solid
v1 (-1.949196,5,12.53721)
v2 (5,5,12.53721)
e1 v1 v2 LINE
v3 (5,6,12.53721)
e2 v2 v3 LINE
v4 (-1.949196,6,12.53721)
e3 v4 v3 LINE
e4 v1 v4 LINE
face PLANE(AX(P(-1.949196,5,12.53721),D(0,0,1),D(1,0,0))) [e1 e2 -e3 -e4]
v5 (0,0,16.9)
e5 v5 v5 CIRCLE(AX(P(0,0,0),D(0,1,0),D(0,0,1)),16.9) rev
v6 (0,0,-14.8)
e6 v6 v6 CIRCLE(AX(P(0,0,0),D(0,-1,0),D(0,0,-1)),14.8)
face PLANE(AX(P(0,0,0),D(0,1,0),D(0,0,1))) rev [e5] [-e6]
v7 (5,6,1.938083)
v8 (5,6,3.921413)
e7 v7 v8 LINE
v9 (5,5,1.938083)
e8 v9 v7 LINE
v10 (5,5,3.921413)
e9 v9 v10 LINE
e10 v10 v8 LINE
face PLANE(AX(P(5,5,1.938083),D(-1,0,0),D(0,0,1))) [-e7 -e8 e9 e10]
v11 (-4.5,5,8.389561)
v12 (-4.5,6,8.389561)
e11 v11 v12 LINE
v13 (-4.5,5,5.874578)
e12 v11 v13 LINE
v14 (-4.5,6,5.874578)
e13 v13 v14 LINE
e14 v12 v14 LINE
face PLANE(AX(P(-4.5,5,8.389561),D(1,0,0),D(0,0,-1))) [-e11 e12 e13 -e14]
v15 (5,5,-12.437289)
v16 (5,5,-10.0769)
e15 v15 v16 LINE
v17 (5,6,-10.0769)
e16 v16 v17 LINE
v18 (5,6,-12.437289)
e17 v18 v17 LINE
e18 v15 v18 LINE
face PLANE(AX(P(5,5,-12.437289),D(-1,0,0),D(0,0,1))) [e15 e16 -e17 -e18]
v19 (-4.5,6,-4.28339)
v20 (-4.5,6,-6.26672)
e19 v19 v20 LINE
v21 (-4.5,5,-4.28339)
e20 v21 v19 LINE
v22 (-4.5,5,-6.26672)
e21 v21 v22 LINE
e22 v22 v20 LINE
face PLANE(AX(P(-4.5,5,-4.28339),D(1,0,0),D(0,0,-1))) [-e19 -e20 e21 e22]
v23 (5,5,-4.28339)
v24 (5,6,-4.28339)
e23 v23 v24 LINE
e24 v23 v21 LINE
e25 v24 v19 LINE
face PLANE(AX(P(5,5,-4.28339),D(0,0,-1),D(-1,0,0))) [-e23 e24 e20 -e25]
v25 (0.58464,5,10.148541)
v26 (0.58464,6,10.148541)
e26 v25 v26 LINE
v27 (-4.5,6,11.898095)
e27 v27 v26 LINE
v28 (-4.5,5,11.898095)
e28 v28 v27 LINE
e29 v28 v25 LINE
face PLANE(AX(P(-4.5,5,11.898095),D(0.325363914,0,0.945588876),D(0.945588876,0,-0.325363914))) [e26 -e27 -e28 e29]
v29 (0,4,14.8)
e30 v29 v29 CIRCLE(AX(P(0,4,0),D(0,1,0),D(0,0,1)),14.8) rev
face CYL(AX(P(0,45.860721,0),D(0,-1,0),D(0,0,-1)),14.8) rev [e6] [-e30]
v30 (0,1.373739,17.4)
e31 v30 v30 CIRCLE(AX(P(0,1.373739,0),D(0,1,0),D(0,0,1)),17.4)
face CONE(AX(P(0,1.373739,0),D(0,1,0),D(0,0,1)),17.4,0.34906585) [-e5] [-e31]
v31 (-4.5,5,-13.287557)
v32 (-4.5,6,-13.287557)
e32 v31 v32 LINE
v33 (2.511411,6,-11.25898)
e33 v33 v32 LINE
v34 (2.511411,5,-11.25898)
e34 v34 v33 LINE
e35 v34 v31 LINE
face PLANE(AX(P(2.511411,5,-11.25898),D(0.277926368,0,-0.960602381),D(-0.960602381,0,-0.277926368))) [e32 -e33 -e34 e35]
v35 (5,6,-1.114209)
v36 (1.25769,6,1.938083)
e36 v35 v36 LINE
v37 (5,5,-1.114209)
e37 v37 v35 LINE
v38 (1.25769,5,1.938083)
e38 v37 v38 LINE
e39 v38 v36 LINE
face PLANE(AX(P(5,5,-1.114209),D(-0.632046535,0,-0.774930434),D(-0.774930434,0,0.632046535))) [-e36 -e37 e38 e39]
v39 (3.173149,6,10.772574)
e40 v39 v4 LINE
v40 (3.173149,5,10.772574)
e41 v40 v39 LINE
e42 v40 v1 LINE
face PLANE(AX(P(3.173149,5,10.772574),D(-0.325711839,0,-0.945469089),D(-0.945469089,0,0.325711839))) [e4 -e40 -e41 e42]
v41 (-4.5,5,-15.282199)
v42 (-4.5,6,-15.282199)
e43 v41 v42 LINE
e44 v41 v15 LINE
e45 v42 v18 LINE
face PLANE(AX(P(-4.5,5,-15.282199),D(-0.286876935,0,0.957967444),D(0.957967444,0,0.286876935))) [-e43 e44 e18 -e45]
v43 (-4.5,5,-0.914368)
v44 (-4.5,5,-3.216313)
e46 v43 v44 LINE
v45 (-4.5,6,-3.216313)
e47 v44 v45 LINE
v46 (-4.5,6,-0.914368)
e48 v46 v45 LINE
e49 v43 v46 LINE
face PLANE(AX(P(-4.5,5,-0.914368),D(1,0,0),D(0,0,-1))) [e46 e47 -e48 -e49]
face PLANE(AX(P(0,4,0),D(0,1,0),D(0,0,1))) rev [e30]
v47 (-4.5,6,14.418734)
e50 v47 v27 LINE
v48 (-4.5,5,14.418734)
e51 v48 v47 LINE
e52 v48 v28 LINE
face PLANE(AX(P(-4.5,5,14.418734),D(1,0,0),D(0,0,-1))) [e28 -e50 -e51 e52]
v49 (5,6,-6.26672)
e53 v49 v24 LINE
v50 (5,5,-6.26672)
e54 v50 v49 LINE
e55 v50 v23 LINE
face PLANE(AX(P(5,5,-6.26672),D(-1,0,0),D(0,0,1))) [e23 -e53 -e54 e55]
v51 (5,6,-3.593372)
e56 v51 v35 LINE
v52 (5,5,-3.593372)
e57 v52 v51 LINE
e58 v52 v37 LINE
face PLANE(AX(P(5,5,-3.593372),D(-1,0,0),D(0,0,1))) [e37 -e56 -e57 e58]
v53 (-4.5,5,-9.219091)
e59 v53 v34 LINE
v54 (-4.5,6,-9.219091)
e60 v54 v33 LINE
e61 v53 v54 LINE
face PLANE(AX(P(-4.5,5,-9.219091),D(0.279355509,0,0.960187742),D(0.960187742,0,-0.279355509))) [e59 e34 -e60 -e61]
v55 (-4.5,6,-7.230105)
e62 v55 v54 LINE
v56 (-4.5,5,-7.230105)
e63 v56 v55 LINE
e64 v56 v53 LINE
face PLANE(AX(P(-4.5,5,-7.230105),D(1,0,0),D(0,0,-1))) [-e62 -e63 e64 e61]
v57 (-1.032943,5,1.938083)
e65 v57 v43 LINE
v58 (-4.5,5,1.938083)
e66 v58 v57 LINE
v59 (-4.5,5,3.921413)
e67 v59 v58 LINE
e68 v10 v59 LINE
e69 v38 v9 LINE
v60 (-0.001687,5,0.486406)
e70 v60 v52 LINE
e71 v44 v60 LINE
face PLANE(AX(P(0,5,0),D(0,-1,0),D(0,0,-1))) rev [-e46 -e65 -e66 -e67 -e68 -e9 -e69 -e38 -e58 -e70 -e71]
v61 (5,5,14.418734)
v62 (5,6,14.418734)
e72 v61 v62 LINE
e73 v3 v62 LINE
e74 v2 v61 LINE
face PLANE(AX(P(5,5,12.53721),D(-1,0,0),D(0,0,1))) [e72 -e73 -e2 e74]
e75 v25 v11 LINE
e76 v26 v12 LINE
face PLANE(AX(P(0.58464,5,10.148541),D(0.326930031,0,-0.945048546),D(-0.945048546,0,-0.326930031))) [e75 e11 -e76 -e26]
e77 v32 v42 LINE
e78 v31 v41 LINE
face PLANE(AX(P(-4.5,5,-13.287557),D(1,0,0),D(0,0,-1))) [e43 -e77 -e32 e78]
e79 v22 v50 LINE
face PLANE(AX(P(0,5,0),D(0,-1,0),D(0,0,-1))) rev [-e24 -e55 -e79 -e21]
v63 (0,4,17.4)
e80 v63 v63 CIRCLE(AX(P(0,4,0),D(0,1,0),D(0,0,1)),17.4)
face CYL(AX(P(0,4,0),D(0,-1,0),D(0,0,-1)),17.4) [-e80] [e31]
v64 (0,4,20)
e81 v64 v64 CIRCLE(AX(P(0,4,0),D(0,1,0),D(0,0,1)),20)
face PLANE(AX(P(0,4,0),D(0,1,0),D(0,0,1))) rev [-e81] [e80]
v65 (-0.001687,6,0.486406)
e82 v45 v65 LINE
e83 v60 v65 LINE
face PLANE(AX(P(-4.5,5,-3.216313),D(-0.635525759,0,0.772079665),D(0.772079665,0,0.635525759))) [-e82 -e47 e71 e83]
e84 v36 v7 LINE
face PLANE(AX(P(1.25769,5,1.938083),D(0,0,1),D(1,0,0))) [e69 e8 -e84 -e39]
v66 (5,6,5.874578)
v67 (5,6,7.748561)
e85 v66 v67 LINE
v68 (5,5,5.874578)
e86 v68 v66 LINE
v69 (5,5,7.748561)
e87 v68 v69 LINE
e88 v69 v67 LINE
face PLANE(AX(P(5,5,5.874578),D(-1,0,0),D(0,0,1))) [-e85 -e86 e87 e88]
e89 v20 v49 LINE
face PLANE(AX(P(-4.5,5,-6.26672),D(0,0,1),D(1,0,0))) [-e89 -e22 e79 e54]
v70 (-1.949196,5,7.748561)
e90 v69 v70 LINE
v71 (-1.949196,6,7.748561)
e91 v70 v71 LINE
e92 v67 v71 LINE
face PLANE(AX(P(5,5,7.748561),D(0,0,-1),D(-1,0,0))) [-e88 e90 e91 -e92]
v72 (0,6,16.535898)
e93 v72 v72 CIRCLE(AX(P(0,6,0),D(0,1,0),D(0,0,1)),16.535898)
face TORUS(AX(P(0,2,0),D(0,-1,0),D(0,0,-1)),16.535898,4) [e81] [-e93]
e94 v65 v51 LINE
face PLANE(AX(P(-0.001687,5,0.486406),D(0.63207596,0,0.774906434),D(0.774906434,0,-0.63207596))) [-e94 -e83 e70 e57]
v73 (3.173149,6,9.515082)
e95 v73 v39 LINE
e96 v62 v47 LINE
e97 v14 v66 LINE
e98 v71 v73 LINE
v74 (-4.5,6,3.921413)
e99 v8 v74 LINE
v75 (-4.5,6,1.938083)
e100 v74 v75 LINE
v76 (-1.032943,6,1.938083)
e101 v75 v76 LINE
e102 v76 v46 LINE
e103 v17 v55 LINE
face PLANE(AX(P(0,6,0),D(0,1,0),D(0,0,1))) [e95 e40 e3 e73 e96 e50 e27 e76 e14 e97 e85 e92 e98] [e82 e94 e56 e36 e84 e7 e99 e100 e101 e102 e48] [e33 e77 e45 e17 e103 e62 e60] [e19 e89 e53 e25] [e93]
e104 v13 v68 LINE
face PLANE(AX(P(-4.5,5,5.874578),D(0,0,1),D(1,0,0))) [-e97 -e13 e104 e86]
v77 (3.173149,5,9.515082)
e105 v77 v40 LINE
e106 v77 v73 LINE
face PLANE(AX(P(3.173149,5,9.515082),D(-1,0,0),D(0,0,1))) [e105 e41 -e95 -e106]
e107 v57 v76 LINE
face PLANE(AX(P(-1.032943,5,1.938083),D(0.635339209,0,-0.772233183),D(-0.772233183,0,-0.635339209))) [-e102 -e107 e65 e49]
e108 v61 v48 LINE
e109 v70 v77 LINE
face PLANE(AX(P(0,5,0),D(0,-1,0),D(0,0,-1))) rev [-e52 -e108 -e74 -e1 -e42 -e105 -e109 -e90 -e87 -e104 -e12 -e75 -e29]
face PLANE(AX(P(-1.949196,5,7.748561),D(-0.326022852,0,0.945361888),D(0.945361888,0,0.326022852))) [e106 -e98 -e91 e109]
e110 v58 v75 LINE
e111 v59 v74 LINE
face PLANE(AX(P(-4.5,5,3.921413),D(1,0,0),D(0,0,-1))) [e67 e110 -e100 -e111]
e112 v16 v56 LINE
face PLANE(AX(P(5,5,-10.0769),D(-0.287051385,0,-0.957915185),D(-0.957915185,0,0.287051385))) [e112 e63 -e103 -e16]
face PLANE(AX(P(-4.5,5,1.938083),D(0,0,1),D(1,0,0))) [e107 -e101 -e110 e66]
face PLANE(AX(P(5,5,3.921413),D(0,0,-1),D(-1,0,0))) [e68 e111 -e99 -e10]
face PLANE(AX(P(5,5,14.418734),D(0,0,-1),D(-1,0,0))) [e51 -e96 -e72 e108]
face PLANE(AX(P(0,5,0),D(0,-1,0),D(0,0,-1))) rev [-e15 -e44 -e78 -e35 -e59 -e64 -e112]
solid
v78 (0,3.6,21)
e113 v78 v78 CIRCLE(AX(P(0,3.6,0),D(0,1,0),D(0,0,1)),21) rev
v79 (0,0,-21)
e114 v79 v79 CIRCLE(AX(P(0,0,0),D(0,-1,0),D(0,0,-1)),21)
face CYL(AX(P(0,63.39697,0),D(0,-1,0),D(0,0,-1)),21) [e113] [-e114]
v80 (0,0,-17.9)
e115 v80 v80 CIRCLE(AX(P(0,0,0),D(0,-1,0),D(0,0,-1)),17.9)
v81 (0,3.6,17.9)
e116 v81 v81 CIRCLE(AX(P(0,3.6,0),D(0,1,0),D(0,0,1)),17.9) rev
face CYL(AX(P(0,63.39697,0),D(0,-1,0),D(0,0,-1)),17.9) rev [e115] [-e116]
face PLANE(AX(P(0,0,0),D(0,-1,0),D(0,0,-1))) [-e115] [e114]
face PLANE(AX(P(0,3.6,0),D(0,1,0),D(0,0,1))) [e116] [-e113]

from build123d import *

# Parameters (mm, degrees)
SKETCH1_R           = 17.4
BOSS_EXTRUDE1_DEPTH = 4
SKETCH2_R           = 20
BOSS_EXTRUDE2_DEPTH = 2
CHAMFER1_SIZE       = 0.5
CHAMFER1_SIZE2      = 1.37373871
SKETCH4_R           = 21
SKETCH4_R_2         = 17.9
BOSS_EXTRUDE4_DEPTH = 3.6
FILLET1_R           = 4
SKETCH3_W           = 9.5
SKETCH3_H           = 1.983330026
CUT_EXTRUDE1_DEPTH  = 1
SKETCH5_R           = 14.8
CUT_EXTRUDE2_DEPTH  = 4


with BuildPart() as part:
    # Sketch1 → Boss-Extrude1 (new body)
    with BuildSketch(Plane(origin=(0, 0, 0), x_dir=(1, 0, 0), z_dir=(0, 1, 0))):
        with Locations(Location((0, 0, 0), (0, 0, 270))):
            Circle(SKETCH1_R)
    extrude(amount=BOSS_EXTRUDE1_DEPTH)

    # Sketch2 → Boss-Extrude2 (add)
    with BuildSketch(Plane(origin=(0, 4, 0), x_dir=(1, 0, 0), z_dir=(0, 1, 0))):
        with Locations(Location((0, 0, 0), (0, 0, 270))):
            Circle(SKETCH2_R)
    extrude(amount=BOSS_EXTRUDE2_DEPTH)

    # Chamfer1
    chamfer1_edges = [part.edges().sort_by_distance(p)[0] for p in [
        (0, 0, -17.4),
    ]]
    chamfer1_side = [part.faces().sort_by_distance(p)[0] for p in [
        (0, 0, 0),
    ]]
    chamfer(chamfer1_edges, length=CHAMFER1_SIZE, length2=CHAMFER1_SIZE2, reference=chamfer1_side[0])

    # Fillet1
    # the kernel refuses this fillet: 4 mm, written as the material it takes off along each edge
    with BuildSketch(Plane(origin=(0, 6, 0), x_dir=(0, 0, 1), z_dir=(-1, 0, 0))) as fillet1_piece_1:
        with BuildLine():
            CenterArc((16.535898385, -4), FILLET1_R, 30, 60)
            Line((16.535898385, 0), (16.535898385, 0.08))
            Line((16.535898385, 0.08), (20, 0.08))
            Line((20, 0.08), (20.08, 0))
            ThreePointArc((20.08, 0), (20.08, -1), (20.069282032, -1.96))
            Line((20.069282032, -1.96), (20, -2))
        make_face()
    revolve(axis=Axis((0, 6, 0), (0, 1, 0)), mode=Mode.SUBTRACT)

    # Sketch3 → Cut-Extrude1 (cut)
    with BuildSketch(Plane(origin=(0, 6, 0), x_dir=(1, 0, 0), z_dir=(0, 1, 0))):
        Polygon((-4.5, -14.418733876), (-4.5, -11.89809486), (0.584639809, -10.148541377), (-4.5, -8.389561421), (-4.5, -5.874578289), (5, -5.874578289), (5, -7.748561222), (-1.949196269, -7.748561222), (3.173149434, -9.515082358), (3.173149434, -10.772573923), (-1.949196269, -12.537209764), (5, -12.537209764), (5, -14.418733876), align=None)
        Polygon((-4.5, -3.921412979), (-4.5, -1.938082953), (-1.032943044, -1.938082953), (-4.5, 0.91436793), (-4.5, 3.21631276), (-0.001686843, -0.486406033), (5, 3.593371701), (5, 1.114209168), (1.257690018, -1.938082953), (5, -1.938082953), (5, -3.921412979), align=None)
        with Locations((0.25, 5.275054574)):
            Rectangle(SKETCH3_W, SKETCH3_H)
        Polygon((-4.5, 7.23010518), (-4.5, 9.21909109), (2.511410994, 11.258979956), (-4.5, 13.287557055), (-4.5, 15.282198849), (5, 12.437289145), (5, 10.076900179), align=None)
    extrude(amount=-CUT_EXTRUDE1_DEPTH, mode=Mode.SUBTRACT)

    # Sketch5 → Cut-Extrude2 (cut)
    with BuildSketch(Plane.XZ):
        with Locations(Location((0, 0, 0), (0, 0, 270))):
            Circle(SKETCH5_R)
    extrude(amount=-CUT_EXTRUDE2_DEPTH, mode=Mode.SUBTRACT)


with BuildPart() as body_2:
    # Sketch4 → Boss-Extrude4 (new body)
    with BuildSketch(Plane.XZ):
        with Locations(Location((0, 0, 0), (0, 0, 270))):
            Circle(SKETCH4_R)
        with Locations(Location((0, 0, 0), (0, 0, 270))):
            Circle(SKETCH4_R_2, mode=Mode.SUBTRACT)
    extrude(amount=-BOSS_EXTRUDE4_DEPTH)


solid = Compound([part.part, body_2.part])
